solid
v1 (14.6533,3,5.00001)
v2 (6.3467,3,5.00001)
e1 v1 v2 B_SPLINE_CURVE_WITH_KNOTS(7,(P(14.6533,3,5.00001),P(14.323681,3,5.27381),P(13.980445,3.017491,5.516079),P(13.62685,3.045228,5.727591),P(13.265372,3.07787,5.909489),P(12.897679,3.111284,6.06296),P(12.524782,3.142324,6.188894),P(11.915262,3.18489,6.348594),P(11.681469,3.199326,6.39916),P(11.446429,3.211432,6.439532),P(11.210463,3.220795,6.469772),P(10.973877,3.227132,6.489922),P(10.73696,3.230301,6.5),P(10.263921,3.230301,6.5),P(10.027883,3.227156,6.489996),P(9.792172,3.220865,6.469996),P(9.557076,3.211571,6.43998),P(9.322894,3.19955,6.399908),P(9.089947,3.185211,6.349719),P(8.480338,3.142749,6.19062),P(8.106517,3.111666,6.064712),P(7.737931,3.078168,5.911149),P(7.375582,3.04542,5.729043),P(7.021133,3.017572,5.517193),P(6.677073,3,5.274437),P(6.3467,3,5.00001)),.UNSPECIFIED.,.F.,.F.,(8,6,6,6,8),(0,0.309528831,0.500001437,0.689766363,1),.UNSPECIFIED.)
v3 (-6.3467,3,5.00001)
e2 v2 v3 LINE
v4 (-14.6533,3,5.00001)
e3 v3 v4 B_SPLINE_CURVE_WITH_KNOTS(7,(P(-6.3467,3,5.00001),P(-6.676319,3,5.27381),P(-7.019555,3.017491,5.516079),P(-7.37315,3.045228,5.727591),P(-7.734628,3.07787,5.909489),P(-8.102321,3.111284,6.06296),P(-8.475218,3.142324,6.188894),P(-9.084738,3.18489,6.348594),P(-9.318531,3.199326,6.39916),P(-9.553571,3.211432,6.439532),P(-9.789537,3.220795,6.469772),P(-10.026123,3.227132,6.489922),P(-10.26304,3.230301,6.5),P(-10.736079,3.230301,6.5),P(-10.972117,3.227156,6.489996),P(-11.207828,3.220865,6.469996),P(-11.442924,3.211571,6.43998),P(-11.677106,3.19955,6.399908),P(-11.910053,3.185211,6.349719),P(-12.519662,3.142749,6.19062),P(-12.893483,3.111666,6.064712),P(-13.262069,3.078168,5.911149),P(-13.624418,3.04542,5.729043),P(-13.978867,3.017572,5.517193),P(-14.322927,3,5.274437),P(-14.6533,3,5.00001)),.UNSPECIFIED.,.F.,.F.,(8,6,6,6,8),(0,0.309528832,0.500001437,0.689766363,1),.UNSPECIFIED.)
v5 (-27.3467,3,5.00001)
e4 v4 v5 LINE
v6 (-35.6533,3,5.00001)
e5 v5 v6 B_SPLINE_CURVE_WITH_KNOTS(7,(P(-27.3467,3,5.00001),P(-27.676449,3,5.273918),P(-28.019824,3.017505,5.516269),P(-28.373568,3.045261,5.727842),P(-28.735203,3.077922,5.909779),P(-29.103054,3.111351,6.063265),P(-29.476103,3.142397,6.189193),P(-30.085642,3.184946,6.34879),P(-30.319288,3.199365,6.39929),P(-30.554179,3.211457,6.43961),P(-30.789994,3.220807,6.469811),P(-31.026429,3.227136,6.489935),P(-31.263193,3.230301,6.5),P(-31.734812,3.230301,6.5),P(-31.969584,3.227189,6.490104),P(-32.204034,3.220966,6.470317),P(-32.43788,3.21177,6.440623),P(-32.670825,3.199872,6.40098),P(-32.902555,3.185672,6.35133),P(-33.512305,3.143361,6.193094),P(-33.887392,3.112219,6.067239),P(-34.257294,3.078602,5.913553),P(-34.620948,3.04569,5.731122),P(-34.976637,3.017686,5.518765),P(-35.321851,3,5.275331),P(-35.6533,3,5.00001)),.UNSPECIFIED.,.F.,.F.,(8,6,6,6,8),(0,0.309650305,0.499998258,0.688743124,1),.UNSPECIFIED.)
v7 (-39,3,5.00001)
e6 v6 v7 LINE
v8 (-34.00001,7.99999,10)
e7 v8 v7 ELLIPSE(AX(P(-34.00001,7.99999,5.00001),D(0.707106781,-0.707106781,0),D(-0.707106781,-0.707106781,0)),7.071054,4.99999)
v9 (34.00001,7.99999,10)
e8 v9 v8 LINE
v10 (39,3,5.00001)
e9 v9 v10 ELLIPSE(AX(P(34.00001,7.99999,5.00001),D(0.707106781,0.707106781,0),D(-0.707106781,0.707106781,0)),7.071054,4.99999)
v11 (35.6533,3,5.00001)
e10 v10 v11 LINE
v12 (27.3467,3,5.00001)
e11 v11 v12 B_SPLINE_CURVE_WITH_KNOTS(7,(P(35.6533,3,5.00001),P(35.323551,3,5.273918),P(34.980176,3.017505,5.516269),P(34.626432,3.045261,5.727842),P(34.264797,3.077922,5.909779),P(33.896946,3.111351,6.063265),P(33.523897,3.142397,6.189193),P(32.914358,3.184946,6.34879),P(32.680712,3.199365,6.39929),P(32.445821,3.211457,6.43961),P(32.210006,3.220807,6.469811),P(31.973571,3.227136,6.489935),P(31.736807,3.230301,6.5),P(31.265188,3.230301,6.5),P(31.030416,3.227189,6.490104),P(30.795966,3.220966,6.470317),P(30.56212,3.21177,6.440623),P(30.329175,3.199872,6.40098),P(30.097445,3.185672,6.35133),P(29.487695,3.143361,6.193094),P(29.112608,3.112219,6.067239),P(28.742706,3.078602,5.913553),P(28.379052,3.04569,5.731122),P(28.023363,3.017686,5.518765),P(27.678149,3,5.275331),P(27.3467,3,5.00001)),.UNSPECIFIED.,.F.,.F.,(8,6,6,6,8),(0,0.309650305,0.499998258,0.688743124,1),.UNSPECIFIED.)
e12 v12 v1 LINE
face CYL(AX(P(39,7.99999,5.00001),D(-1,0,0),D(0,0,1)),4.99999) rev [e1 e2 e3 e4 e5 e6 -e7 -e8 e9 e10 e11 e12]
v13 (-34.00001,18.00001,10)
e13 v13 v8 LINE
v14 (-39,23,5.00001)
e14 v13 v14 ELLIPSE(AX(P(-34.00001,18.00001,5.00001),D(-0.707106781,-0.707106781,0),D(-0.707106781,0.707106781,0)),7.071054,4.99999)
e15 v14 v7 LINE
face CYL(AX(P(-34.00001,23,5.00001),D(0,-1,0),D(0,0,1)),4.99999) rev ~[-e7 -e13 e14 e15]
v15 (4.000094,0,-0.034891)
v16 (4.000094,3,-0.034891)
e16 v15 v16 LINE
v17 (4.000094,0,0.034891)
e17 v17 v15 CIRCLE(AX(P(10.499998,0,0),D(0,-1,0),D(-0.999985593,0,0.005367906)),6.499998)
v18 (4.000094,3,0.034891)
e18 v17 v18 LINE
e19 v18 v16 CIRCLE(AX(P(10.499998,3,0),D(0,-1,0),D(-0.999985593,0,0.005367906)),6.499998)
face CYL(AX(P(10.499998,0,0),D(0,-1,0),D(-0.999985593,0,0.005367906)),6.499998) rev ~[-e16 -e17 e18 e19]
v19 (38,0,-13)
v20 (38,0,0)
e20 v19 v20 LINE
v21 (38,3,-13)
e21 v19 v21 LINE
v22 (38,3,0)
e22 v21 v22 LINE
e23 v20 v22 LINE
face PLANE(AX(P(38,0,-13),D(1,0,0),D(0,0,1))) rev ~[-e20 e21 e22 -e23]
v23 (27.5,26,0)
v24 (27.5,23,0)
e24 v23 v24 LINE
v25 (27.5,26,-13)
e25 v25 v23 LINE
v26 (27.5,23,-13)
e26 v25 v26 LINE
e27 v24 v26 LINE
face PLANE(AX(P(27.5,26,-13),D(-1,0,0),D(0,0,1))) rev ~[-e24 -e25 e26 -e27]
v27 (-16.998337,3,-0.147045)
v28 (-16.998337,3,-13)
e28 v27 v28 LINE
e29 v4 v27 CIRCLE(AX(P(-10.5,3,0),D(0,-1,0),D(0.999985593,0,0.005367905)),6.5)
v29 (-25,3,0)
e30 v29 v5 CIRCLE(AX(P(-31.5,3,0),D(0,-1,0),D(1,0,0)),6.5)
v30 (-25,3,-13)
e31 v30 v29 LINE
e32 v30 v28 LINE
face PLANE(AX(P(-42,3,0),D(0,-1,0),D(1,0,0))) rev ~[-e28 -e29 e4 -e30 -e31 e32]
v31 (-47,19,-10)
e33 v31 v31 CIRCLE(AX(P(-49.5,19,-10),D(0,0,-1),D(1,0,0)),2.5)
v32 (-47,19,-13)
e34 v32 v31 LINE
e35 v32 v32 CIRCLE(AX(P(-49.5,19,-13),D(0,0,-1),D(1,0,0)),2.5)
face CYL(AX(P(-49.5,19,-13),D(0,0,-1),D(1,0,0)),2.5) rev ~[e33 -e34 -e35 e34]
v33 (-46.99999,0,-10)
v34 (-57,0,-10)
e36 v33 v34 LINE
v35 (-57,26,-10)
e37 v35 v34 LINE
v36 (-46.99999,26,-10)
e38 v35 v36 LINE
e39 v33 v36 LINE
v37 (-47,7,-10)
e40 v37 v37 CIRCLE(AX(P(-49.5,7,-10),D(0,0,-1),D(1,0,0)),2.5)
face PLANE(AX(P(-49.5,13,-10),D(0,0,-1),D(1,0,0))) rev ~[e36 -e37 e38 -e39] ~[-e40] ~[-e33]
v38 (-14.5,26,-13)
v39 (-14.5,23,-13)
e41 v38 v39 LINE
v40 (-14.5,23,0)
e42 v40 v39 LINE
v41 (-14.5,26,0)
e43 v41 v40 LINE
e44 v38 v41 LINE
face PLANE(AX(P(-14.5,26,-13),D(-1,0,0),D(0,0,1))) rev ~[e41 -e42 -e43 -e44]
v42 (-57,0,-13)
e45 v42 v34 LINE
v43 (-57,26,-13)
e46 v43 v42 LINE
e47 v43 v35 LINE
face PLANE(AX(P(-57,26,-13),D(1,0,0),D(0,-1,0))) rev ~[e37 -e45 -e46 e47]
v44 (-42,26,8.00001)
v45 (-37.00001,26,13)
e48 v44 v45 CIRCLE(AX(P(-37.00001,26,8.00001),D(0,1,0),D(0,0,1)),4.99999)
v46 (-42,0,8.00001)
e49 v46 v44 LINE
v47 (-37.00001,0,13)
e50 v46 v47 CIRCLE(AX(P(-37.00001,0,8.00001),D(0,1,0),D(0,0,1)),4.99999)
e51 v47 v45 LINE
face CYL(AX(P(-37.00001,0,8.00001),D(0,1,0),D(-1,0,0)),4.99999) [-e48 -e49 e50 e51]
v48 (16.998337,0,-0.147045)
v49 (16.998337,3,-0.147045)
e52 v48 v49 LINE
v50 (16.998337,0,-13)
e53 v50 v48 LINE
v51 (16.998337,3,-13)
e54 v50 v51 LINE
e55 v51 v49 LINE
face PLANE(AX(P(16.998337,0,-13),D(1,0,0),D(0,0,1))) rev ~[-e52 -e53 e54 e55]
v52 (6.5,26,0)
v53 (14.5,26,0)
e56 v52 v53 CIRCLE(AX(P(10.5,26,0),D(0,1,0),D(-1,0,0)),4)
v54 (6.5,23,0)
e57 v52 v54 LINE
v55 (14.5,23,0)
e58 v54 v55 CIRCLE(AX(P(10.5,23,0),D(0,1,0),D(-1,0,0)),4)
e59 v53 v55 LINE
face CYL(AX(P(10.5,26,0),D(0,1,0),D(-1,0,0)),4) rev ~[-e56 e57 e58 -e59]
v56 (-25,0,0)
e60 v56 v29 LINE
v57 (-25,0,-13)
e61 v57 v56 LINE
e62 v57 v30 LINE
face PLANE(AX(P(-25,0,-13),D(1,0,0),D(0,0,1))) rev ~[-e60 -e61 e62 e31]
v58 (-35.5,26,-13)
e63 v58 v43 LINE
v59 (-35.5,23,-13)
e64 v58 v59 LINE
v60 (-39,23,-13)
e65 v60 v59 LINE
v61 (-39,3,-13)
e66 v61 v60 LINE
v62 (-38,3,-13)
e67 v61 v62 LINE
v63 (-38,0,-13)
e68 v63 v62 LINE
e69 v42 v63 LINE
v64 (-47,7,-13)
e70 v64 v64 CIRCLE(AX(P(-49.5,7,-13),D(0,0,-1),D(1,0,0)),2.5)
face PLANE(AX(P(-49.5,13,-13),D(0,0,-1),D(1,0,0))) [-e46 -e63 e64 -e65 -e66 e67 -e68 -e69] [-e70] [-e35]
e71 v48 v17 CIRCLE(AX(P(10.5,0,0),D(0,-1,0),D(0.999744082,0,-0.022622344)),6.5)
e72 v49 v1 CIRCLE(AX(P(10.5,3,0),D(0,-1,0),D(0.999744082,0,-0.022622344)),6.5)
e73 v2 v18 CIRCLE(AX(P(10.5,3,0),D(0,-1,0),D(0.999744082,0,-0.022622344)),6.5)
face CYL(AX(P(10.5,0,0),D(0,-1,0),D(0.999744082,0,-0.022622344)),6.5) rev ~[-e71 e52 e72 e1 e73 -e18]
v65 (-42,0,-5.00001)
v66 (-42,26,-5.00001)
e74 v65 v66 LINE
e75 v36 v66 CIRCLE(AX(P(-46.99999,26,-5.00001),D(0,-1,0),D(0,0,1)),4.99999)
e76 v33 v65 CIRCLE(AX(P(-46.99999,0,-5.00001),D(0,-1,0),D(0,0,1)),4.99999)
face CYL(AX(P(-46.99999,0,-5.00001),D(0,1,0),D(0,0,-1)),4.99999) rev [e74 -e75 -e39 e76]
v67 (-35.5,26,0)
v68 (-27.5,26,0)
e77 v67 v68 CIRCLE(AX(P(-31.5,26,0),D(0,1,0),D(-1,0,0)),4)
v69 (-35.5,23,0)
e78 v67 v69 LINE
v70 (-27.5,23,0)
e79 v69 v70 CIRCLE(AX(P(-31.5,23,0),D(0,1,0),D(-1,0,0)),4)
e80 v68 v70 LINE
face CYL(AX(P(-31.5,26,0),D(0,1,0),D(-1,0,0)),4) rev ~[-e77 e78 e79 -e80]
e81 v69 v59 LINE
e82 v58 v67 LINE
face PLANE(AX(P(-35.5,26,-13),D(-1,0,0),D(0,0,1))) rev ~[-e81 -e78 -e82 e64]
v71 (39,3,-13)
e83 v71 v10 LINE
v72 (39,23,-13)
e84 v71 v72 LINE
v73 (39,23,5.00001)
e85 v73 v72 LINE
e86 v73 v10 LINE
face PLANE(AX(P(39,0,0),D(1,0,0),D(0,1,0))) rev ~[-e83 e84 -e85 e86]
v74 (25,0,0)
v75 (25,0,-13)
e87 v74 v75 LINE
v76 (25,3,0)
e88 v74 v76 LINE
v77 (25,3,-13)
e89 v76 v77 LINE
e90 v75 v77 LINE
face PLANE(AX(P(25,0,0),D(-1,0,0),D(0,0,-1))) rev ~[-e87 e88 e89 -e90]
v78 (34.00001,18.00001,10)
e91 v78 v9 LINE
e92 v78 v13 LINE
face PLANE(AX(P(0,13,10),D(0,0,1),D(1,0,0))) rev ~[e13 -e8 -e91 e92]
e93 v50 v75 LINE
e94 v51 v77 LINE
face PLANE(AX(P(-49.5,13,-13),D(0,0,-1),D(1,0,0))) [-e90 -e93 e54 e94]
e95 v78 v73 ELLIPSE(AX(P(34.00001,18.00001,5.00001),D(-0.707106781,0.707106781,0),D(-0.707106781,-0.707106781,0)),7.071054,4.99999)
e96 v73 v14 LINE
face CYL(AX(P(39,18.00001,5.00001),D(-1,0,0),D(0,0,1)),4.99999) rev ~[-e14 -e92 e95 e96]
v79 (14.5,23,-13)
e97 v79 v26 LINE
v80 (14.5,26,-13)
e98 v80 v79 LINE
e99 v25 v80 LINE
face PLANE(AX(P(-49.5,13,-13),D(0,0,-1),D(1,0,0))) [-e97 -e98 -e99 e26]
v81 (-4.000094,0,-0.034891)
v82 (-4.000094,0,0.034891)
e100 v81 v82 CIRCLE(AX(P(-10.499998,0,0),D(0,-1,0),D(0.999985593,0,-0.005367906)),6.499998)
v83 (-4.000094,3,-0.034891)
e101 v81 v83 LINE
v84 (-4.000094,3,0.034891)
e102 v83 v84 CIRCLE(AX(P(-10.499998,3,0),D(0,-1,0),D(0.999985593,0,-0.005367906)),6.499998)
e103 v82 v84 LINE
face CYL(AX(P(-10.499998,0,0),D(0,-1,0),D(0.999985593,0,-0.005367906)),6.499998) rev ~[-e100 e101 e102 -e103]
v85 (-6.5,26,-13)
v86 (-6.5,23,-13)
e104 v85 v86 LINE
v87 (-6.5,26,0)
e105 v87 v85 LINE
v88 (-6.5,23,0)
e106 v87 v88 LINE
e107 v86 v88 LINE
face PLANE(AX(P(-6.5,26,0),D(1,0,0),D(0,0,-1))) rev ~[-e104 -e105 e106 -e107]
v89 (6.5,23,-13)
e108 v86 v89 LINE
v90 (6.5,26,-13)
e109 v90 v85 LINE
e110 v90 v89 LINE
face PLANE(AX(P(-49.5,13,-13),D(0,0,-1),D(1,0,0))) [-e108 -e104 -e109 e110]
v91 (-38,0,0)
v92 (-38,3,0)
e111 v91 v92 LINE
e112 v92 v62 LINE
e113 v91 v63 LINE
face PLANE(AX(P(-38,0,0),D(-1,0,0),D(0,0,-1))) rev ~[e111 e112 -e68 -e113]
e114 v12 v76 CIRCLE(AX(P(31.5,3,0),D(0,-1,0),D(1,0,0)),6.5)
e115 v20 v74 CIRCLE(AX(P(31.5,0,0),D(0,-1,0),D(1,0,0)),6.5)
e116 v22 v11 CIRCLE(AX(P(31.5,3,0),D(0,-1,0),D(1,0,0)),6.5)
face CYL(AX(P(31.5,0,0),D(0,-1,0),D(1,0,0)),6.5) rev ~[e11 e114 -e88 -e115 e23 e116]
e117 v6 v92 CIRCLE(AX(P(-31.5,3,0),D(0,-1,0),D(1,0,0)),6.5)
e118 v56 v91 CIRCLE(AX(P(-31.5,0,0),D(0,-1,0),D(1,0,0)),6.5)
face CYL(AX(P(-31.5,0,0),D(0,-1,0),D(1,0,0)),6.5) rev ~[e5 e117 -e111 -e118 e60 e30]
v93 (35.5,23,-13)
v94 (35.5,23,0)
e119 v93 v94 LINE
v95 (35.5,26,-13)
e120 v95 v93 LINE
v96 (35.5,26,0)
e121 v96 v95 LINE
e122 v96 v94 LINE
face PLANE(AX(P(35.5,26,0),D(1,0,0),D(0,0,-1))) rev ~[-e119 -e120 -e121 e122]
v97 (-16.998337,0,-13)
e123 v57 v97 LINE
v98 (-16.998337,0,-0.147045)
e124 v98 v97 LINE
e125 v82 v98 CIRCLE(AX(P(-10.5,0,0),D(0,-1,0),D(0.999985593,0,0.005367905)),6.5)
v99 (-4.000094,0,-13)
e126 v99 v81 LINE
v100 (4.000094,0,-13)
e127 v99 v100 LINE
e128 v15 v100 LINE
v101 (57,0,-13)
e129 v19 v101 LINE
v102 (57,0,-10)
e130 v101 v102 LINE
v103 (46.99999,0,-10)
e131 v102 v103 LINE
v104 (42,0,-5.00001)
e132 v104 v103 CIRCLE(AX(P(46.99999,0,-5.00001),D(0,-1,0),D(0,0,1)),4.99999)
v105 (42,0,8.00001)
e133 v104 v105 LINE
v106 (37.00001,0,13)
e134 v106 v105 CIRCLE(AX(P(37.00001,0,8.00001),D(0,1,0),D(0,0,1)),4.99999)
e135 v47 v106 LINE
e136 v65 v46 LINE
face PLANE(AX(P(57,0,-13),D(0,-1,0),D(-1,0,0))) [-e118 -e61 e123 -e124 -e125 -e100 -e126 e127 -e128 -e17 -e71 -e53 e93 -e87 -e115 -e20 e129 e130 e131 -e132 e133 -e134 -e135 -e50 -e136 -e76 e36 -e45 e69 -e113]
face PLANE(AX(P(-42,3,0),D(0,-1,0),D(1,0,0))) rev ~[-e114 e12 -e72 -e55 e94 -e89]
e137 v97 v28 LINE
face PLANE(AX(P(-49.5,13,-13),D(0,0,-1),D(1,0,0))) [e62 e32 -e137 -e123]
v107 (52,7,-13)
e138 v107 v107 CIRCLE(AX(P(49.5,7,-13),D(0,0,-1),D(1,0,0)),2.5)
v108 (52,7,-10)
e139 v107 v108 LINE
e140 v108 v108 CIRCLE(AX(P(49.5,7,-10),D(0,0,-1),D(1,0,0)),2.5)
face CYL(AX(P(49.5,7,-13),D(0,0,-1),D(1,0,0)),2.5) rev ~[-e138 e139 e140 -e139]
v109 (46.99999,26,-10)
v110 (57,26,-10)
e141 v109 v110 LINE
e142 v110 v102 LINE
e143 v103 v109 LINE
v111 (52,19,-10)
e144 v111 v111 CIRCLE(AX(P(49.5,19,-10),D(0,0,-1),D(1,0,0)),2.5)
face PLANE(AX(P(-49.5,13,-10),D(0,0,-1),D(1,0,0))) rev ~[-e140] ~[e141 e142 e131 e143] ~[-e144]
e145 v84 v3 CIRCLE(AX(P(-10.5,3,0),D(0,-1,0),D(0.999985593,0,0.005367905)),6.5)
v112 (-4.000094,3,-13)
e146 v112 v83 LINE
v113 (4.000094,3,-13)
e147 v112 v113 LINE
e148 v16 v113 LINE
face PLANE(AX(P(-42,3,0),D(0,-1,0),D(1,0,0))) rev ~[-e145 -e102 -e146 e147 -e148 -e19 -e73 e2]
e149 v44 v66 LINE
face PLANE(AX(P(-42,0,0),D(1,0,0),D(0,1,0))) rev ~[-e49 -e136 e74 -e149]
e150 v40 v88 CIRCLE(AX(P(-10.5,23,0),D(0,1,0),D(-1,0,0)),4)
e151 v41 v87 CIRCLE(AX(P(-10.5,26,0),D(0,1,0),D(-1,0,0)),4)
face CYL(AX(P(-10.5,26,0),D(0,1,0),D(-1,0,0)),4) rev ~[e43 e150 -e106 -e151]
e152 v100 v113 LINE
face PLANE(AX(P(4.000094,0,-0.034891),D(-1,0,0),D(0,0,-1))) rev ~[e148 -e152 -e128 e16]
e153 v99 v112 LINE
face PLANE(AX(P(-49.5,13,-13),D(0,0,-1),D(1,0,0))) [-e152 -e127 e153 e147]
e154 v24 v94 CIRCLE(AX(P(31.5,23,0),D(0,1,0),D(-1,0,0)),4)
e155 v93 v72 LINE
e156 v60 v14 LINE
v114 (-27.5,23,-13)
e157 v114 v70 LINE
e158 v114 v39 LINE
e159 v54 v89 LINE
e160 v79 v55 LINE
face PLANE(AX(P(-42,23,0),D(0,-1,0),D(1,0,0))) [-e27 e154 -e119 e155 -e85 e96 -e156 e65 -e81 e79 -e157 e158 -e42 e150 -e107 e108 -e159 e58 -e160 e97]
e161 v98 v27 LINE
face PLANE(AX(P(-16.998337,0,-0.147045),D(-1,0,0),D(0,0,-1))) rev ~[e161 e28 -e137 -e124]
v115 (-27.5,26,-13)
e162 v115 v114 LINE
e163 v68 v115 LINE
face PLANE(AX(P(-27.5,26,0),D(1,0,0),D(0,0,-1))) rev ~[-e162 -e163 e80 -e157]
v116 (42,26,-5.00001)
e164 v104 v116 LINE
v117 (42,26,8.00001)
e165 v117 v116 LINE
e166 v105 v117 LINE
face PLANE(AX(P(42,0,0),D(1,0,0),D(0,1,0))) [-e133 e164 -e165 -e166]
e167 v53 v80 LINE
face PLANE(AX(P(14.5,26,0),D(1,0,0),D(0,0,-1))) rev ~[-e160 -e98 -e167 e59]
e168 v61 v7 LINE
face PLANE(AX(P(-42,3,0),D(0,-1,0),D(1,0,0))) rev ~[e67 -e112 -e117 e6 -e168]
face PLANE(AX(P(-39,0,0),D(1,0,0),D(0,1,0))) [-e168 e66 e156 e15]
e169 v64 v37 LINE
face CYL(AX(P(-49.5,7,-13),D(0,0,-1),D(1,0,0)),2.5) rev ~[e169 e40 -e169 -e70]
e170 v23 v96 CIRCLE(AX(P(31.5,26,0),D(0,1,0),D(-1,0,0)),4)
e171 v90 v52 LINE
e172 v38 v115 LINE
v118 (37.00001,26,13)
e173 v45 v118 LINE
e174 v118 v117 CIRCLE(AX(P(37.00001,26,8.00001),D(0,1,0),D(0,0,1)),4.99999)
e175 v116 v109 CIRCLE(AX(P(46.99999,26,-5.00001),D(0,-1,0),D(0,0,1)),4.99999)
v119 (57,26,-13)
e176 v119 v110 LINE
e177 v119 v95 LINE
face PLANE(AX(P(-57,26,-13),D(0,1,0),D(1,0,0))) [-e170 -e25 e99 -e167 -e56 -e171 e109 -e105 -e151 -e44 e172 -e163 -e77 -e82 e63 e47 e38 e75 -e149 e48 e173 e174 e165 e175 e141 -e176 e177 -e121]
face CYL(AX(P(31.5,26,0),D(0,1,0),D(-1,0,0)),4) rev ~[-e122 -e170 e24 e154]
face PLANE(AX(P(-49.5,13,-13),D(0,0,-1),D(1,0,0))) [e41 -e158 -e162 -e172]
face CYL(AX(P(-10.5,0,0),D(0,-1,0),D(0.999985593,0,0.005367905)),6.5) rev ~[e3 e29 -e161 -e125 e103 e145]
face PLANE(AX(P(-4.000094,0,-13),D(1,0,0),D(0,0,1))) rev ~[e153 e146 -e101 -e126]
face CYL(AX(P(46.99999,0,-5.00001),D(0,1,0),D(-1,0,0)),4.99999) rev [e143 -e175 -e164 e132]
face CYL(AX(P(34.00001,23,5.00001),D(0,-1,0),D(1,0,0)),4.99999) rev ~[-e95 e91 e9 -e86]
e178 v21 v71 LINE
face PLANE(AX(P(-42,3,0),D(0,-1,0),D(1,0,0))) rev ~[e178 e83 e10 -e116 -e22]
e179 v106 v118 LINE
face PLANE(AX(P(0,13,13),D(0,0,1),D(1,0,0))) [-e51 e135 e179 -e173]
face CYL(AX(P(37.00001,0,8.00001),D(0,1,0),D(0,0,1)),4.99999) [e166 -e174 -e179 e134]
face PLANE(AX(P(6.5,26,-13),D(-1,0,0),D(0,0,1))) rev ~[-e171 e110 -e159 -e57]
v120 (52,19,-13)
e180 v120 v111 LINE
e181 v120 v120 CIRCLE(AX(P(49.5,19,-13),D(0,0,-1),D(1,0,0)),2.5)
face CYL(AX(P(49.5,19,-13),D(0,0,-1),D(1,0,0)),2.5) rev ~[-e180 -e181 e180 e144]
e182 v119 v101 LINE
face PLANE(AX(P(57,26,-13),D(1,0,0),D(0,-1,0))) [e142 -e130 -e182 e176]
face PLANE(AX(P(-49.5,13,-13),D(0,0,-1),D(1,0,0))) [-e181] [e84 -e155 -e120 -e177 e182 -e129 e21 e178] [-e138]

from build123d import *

# Parameters (mm, degrees)
F1_W          = 84
F1_H          = 26
F2_DEPTH      = 13
F2_DEPTH_BACK = 13
F3_T          = -3
F5_W          = 15
F5_H          = 26
F5_R          = 2.5
F5_W_2        = 84
F5_W_3        = 78
F5_H_2        = 20
F6_DEPTH      = 3
F7_R          = 4.99999
F9_DEPTH      = 5
F10_DEPTH     = 25


# Not quite as in the source:
# - a fillet or chamfer is up to 0.001 mm smaller than in the source, because OpenCascade refuses the exact size


with BuildPart() as f2:
    # F1 (on Top) → F2 (new body, two sides)
    with BuildSketch(Plane.XY) as f2_sk:
        with Locations((0, 13)):
            Rectangle(F1_W, F1_H)
    extrude(amount=F2_DEPTH)
    extrude(f2_sk.sketch, amount=-F2_DEPTH_BACK)

    # F3
    f3_openings = [f2.faces().sort_by_distance(p)[0] for p in [
        (0, 13, -13),
    ]]
    offset(amount=F3_T, openings=f3_openings)

    # F5 (on face) → F6 (join)
    with BuildSketch(Plane(origin=(0, 0, -13), x_dir=(1, 0, 0), z_dir=(0, 0, -1))):
        with Locations((-49.5, -13)):
            Rectangle(F5_W, F5_H)
        with Locations((-49.5, -19)):
            Circle(F5_R, mode=Mode.SUBTRACT)
        with Locations((-49.5, -7)):
            Circle(F5_R, mode=Mode.SUBTRACT)
        with Locations((0, -13)):
            Rectangle(F5_W_2, F5_H)
        with Locations((0, -13)):
            Rectangle(F5_W_3, F5_H_2, mode=Mode.SUBTRACT)
        with Locations((49.5, -13)):
            Rectangle(F5_W, F5_H)
        with Locations((49.5, -19)):
            Circle(F5_R, mode=Mode.SUBTRACT)
        with Locations((49.5, -7)):
            Circle(F5_R, mode=Mode.SUBTRACT)
    extrude(amount=-F6_DEPTH)

    # F7 (radius 5 in the source; OpenCascade refuses exactly that, so slightly less here)
    f7_edges = [f2.edges().sort_by_distance(p)[0] for p in [
        (-42, 13, 13),
        (42, 13, 13),
        (-42, 13, -10),
        (42, 13, -10),
        (0, 23, 10),
        (0, 3, 10),
        (-39, 13, 10),
        (39, 13, 10),
    ]]
    fillet(f7_edges, radius=F7_R)

    # F8 (on face) → F9 (cut)
    with BuildSketch(Plane.XZ):
        with BuildLine():
            Line((-25, -11), (-25, 0))
            ThreePointArc((-25, 0), (-31.5, 6.5), (-38, 0))
            Line((-38, 0), (-38, -11))
            Line((-38, -11), (-38, -13))
            Line((-38, -13), (-25, -13))
            Line((-25, -13), (-25, -11))
        make_face()
        with BuildLine():
            Line((-4.0000936475, -11), (-4.0000936475, -0.0348913798))
            ThreePointArc((-4.0000936475, -0.0348913798), (-4, 0), (-4.0000936475, 0.0348913798))
            ThreePointArc((-4.0000936475, 0.0348913798), (-10.5909716955, 6.499363365), (-16.9983365331, -0.1470452389))
            Line((-16.9983365331, -0.1470452389), (-16.9983365331, -10.9773843356))
            Line((-16.9983365331, -10.9773843356), (-16.9983365331, -13))
            Line((-16.9983365331, -13), (-4.0000936475, -13))
            Line((-4.0000936475, -13), (-4.0000936475, -11))
        make_face()
        with BuildLine():
            ThreePointArc((4.0000936475, 0.0348913798), (4, 0), (4.0000936475, -0.0348913798))
            Line((4.0000936475, -0.0348913798), (4.0000936475, -11))
            Line((4.0000936475, -11), (4.0000936475, -13))
            Line((4.0000936475, -13), (16.9983365331, -13))
            Line((16.9983365331, -13), (16.9983365331, -10.9773843356))
            Line((16.9983365331, -10.9773843356), (16.9983365331, -0.1470452389))
            ThreePointArc((16.9983365331, -0.1470452389), (10.5909716955, 6.499363365), (4.0000936475, 0.0348913798))
        make_face()
        with BuildLine():
            ThreePointArc((38, 0), (31.5, 6.5), (25, 0))
            Line((25, 0), (25, -11))
            Line((25, -11), (25, -13))
            Line((25, -13), (38, -13))
            Line((38, -13), (38, -11))
            Line((38, -11), (38, 0))
        make_face()
    extrude(amount=-F9_DEPTH, mode=Mode.SUBTRACT)

    # F4 (on face) → F10 (cut)
    with BuildSketch(Plane(origin=(0, 26, 0), x_dir=(-1, 0, 0), z_dir=(0, 1, 0))):
        with BuildLine():
            Line((-6.5, -13), (-6.5, 0))
            ThreePointArc((-6.5, 0), (-10.5, 4), (-14.5, 0))
            Line((-14.5, 0), (-14.5, -13))
            Line((-14.5, -13), (-6.5, -13))
        make_face()
        with BuildLine():
            Line((-27.5, -13), (-27.5, 0))
            ThreePointArc((-27.5, 0), (-31.5, 4), (-35.5, 0))
            Line((-35.5, 0), (-35.5, -13))
            Line((-35.5, -13), (-27.5, -13))
        make_face()
        with BuildLine():
            ThreePointArc((14.5, 0), (10.5, 4), (6.5, 0))
            Line((6.5, 0), (6.5, -13))
            Line((6.5, -13), (14.5, -13))
            Line((14.5, -13), (14.5, 0))
        make_face()
        with BuildLine():
            ThreePointArc((35.5, 0), (31.5, 4), (27.5, 0))
            Line((27.5, 0), (27.5, -13))
            Line((27.5, -13), (35.5, -13))
            Line((35.5, -13), (35.5, 0))
        make_face()
    extrude(amount=-F10_DEPTH, mode=Mode.SUBTRACT)


solid = f2.part
